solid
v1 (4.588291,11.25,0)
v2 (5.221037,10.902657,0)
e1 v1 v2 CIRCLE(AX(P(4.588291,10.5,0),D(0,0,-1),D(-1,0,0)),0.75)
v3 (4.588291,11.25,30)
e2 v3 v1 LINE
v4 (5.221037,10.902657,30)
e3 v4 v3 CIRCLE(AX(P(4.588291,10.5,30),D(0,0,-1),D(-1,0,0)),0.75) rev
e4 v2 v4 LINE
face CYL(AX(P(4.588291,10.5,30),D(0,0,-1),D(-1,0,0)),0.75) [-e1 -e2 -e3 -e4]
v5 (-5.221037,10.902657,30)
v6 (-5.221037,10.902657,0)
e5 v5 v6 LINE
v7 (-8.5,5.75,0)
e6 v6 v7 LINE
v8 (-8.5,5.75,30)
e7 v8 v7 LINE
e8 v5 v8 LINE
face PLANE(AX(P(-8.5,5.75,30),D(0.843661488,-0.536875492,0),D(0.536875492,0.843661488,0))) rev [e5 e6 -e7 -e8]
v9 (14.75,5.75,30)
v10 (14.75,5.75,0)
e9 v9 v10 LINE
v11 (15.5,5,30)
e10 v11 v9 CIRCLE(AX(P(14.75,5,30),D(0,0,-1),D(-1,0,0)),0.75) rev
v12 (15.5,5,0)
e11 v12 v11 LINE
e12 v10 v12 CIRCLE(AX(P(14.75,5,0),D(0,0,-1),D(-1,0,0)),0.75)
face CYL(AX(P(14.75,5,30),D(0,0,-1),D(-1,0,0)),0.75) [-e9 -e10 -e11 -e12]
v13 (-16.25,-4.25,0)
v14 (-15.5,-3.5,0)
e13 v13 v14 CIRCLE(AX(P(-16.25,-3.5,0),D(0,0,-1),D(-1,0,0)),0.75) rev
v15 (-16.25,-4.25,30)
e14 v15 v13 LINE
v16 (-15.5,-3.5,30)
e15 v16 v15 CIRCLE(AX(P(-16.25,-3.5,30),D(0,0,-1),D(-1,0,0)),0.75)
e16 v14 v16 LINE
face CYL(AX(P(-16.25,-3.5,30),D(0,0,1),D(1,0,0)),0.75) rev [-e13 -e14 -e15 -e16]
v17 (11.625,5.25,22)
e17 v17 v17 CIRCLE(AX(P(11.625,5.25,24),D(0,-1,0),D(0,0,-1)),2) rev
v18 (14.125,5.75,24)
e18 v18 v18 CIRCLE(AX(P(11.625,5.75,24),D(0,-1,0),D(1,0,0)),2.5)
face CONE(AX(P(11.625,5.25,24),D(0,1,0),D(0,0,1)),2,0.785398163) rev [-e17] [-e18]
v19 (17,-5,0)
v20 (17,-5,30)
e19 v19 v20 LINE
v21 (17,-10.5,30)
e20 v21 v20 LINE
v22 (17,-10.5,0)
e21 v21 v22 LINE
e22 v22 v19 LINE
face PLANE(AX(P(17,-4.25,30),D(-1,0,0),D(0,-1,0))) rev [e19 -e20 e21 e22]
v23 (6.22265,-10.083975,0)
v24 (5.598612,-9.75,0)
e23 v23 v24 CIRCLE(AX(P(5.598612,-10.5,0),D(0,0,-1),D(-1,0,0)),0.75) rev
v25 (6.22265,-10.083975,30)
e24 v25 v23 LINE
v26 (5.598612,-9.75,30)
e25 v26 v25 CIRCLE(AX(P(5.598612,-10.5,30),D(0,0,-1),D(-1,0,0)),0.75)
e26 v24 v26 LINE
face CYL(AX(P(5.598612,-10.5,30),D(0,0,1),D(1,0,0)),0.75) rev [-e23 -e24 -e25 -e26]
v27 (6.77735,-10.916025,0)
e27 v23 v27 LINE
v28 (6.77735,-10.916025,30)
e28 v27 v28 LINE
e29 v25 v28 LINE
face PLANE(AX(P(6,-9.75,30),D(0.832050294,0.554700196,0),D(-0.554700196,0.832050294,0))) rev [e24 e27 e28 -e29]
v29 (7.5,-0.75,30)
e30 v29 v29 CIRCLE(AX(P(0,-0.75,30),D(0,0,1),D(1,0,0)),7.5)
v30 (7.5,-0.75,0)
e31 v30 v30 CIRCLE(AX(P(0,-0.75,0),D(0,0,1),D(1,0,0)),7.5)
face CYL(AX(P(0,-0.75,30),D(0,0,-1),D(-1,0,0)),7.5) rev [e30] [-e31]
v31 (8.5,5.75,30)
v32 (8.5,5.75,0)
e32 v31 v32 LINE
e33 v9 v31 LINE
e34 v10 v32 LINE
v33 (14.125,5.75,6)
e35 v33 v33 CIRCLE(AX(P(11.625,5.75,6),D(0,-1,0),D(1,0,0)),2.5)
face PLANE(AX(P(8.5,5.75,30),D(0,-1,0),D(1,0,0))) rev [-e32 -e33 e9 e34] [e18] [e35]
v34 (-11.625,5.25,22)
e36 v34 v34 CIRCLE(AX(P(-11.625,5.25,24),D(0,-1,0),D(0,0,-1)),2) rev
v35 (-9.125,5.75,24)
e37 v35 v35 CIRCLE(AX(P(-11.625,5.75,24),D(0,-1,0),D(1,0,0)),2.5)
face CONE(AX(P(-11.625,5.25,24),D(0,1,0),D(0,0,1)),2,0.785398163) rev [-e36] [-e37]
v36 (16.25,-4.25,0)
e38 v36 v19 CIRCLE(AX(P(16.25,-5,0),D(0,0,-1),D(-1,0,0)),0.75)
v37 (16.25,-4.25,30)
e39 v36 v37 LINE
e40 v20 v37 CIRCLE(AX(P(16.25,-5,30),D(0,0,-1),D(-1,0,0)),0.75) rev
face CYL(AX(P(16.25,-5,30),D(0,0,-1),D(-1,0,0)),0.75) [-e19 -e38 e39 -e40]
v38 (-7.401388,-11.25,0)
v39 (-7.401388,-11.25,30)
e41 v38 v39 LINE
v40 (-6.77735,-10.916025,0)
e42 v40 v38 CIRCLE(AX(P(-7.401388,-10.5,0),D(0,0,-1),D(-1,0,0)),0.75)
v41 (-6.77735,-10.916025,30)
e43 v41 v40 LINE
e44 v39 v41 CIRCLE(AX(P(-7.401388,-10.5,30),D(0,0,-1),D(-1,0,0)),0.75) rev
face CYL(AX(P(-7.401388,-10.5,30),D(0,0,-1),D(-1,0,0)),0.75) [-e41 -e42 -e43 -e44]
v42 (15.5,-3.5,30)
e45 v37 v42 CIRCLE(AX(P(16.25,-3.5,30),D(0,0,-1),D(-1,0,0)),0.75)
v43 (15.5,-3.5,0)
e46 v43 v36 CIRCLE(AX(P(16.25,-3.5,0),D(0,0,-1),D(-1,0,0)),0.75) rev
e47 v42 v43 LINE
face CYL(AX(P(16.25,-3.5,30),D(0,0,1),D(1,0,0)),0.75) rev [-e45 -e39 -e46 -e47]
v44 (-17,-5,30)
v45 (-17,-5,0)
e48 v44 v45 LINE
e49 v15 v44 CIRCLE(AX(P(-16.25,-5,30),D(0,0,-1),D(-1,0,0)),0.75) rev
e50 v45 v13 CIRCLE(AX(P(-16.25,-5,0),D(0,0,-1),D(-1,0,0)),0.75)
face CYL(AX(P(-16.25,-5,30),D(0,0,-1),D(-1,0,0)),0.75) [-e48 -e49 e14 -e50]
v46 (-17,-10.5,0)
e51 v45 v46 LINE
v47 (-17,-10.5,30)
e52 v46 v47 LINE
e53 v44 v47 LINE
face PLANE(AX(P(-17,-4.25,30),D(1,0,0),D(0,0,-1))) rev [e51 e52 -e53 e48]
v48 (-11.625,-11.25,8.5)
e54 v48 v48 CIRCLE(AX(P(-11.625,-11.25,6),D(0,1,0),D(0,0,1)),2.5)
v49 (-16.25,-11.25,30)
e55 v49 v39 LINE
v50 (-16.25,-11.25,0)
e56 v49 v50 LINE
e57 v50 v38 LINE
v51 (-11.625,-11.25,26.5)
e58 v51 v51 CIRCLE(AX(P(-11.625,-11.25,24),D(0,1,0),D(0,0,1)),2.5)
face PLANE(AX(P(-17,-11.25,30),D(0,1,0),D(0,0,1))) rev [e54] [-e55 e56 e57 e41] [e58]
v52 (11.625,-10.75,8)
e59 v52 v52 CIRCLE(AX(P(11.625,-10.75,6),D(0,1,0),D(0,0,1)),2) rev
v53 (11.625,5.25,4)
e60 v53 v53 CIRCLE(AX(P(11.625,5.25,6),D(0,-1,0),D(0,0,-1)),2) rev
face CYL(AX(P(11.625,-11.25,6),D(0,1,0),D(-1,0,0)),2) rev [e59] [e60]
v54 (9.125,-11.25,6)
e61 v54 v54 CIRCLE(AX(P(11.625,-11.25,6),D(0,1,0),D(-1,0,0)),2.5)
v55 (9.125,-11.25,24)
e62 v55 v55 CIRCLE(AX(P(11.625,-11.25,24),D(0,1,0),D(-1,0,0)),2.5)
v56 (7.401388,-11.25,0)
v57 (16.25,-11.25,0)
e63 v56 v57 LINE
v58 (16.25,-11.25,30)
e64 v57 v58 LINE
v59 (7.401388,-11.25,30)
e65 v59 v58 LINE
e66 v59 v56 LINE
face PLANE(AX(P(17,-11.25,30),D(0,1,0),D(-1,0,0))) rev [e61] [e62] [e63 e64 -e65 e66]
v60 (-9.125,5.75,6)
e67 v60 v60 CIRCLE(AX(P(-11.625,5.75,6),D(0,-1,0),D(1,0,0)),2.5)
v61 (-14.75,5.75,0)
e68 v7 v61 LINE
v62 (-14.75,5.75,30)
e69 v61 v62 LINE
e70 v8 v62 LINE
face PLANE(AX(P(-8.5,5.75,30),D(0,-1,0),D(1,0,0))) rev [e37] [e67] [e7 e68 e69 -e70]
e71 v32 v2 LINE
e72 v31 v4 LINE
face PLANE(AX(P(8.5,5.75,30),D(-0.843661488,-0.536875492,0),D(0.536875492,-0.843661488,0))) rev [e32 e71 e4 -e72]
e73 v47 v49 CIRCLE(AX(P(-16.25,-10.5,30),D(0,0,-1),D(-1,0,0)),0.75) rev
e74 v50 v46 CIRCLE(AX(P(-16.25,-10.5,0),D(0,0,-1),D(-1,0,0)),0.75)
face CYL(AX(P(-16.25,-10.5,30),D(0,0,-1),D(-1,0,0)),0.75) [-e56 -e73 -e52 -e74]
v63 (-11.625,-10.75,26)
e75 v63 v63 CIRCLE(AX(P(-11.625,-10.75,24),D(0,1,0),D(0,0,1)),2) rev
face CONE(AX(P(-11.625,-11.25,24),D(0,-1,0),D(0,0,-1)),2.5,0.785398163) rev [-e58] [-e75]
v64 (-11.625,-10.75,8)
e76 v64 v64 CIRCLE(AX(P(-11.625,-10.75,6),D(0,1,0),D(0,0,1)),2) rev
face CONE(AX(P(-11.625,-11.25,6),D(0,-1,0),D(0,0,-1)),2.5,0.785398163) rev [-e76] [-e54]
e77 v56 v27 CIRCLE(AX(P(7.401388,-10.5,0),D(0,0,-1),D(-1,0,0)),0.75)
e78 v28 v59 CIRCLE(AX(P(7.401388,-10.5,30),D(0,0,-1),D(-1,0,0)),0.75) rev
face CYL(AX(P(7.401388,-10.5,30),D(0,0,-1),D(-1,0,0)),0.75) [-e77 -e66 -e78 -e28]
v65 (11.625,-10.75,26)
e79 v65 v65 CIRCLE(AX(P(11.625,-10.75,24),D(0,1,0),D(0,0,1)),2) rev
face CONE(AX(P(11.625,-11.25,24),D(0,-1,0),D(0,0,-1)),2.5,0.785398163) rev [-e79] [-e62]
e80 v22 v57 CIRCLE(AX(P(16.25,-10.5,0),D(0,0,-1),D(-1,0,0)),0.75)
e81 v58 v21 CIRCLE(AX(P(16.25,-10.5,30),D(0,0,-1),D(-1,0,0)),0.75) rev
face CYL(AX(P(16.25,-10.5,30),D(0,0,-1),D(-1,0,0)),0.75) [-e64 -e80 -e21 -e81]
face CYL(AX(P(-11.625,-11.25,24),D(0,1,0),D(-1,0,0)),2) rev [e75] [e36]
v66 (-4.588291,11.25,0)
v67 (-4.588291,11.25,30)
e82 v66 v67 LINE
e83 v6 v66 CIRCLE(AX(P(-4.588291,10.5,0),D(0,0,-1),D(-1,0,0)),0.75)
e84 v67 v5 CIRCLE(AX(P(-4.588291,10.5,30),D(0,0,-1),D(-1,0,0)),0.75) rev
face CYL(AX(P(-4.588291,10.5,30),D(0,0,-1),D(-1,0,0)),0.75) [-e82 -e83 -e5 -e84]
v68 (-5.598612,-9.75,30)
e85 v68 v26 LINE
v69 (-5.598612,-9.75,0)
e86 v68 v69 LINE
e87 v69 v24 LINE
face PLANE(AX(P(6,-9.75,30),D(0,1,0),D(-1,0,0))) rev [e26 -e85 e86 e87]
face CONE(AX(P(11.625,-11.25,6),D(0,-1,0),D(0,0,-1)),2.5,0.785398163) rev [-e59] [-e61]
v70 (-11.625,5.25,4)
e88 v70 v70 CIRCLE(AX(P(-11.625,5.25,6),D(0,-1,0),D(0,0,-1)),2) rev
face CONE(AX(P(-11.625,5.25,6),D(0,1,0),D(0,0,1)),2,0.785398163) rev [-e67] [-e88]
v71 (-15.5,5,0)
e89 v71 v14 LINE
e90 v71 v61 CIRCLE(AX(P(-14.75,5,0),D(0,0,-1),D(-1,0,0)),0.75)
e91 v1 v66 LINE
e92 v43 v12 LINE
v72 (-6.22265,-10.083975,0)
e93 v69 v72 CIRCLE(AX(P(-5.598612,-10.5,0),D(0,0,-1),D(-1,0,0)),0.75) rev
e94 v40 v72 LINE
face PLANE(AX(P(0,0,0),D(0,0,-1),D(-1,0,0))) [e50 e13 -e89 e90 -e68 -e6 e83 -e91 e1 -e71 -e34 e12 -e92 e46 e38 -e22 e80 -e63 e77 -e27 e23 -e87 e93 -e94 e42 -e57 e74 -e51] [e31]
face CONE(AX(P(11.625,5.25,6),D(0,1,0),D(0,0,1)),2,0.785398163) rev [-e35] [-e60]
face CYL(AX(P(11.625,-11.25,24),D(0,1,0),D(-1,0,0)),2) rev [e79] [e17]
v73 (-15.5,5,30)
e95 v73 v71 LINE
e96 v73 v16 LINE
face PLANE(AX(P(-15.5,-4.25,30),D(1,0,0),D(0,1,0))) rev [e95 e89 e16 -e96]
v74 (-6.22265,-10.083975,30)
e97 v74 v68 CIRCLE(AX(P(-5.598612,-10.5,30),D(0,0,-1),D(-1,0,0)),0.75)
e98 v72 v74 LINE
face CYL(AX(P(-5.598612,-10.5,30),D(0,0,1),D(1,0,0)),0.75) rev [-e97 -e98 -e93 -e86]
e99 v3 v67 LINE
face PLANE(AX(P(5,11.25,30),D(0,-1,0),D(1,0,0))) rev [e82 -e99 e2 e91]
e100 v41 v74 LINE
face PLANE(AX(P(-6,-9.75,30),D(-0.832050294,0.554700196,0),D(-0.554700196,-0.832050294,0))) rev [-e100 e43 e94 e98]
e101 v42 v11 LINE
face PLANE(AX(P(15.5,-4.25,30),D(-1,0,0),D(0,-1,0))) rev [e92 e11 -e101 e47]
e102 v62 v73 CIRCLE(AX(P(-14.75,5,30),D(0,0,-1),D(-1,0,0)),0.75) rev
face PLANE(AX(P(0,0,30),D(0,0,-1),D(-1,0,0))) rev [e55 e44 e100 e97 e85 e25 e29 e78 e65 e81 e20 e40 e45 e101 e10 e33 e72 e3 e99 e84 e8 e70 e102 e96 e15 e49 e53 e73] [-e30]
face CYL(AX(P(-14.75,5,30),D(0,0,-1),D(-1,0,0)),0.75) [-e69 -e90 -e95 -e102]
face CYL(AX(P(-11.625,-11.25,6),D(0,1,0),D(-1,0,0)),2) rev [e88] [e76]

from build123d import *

# Parameters (mm, degrees)
SKETCH_1_R          = 7.5
EXTRUDE_1_DEPTH     = 30
FILLET_1_R          = 0.75
SKETCH_2_R          = 2
CUT_EXTRUDE_1_DEPTH = 39.444765573
CHAMFER_1_SIZE      = 0.5


with BuildPart() as part:
    # 草图1 → 凸台-拉伸1 (new body)
    with BuildSketch(Plane.XY):
        Polygon((5, 11.25), (-5, 11.25), (-8.5, 5.75), (-15.5, 5.75), (-15.5, -4.25), (-17, -4.25), (-17, -11.25), (-7, -11.25), (-6, -9.75), (6, -9.75), (7, -11.25), (17, -11.25), (17, -4.25), (15.5, -4.25), (15.5, 5.75), (8.5, 5.75), align=None)
        with Locations((0, -0.75)):
            Circle(SKETCH_1_R, mode=Mode.SUBTRACT)
    extrude(amount=EXTRUDE_1_DEPTH)

    # 圆角1
    fillet_1_edges = [part.edges().sort_by_distance(p)[0] for p in [
        (-17, -11.25, 15),
        (-7, -11.25, 15),
        (-6, -9.75, 15),
        (7, -11.25, 15),
        (6, -9.75, 15),
        (17, -11.25, 15),
        (17, -4.25, 15),
        (15.5, -4.25, 15),
        (15.5, 5.75, 15),
        (5, 11.25, 15),
        (-5, 11.25, 15),
        (-17, -4.25, 15),
        (-15.5, -4.25, 15),
        (-15.5, 5.75, 15),
    ]]
    fillet(fillet_1_edges, radius=FILLET_1_R - 0.0001)  # a hair under: the kernel refuses the full size

    # 草图2 → 切除-拉伸1 (cut, through all)
    with BuildSketch(Plane(origin=(0, 5.75, 0), x_dir=(1, 0, 0), z_dir=(0, 1, 0))):
        with Locations(Location((-11.625, -6, 0), (0, 0, 180))):
            Circle(SKETCH_2_R)
        with Locations(Location((-11.625, -24, 0), (0, 0, 180))):
            Circle(SKETCH_2_R)
        with Locations((11.625, -24)):
            Circle(SKETCH_2_R)
        with Locations((11.625, -6)):
            Circle(SKETCH_2_R)
    extrude(amount=-CUT_EXTRUDE_1_DEPTH, mode=Mode.SUBTRACT)

    # 倒角1
    chamfer_1_edges = [part.edges().sort_by_distance(p)[0] for p in [
        (-9.625, -11.25, 24),
        (-9.625, 5.75, 24),
        (9.625, -11.25, 6),
        (9.625, 5.75, 6),
        (-9.625, -11.25, 6),
        (-9.625, 5.75, 6),
        (9.625, -11.25, 24),
        (9.625, 5.75, 24),
    ]]
    chamfer(chamfer_1_edges, length=CHAMFER_1_SIZE)


solid = part.part
